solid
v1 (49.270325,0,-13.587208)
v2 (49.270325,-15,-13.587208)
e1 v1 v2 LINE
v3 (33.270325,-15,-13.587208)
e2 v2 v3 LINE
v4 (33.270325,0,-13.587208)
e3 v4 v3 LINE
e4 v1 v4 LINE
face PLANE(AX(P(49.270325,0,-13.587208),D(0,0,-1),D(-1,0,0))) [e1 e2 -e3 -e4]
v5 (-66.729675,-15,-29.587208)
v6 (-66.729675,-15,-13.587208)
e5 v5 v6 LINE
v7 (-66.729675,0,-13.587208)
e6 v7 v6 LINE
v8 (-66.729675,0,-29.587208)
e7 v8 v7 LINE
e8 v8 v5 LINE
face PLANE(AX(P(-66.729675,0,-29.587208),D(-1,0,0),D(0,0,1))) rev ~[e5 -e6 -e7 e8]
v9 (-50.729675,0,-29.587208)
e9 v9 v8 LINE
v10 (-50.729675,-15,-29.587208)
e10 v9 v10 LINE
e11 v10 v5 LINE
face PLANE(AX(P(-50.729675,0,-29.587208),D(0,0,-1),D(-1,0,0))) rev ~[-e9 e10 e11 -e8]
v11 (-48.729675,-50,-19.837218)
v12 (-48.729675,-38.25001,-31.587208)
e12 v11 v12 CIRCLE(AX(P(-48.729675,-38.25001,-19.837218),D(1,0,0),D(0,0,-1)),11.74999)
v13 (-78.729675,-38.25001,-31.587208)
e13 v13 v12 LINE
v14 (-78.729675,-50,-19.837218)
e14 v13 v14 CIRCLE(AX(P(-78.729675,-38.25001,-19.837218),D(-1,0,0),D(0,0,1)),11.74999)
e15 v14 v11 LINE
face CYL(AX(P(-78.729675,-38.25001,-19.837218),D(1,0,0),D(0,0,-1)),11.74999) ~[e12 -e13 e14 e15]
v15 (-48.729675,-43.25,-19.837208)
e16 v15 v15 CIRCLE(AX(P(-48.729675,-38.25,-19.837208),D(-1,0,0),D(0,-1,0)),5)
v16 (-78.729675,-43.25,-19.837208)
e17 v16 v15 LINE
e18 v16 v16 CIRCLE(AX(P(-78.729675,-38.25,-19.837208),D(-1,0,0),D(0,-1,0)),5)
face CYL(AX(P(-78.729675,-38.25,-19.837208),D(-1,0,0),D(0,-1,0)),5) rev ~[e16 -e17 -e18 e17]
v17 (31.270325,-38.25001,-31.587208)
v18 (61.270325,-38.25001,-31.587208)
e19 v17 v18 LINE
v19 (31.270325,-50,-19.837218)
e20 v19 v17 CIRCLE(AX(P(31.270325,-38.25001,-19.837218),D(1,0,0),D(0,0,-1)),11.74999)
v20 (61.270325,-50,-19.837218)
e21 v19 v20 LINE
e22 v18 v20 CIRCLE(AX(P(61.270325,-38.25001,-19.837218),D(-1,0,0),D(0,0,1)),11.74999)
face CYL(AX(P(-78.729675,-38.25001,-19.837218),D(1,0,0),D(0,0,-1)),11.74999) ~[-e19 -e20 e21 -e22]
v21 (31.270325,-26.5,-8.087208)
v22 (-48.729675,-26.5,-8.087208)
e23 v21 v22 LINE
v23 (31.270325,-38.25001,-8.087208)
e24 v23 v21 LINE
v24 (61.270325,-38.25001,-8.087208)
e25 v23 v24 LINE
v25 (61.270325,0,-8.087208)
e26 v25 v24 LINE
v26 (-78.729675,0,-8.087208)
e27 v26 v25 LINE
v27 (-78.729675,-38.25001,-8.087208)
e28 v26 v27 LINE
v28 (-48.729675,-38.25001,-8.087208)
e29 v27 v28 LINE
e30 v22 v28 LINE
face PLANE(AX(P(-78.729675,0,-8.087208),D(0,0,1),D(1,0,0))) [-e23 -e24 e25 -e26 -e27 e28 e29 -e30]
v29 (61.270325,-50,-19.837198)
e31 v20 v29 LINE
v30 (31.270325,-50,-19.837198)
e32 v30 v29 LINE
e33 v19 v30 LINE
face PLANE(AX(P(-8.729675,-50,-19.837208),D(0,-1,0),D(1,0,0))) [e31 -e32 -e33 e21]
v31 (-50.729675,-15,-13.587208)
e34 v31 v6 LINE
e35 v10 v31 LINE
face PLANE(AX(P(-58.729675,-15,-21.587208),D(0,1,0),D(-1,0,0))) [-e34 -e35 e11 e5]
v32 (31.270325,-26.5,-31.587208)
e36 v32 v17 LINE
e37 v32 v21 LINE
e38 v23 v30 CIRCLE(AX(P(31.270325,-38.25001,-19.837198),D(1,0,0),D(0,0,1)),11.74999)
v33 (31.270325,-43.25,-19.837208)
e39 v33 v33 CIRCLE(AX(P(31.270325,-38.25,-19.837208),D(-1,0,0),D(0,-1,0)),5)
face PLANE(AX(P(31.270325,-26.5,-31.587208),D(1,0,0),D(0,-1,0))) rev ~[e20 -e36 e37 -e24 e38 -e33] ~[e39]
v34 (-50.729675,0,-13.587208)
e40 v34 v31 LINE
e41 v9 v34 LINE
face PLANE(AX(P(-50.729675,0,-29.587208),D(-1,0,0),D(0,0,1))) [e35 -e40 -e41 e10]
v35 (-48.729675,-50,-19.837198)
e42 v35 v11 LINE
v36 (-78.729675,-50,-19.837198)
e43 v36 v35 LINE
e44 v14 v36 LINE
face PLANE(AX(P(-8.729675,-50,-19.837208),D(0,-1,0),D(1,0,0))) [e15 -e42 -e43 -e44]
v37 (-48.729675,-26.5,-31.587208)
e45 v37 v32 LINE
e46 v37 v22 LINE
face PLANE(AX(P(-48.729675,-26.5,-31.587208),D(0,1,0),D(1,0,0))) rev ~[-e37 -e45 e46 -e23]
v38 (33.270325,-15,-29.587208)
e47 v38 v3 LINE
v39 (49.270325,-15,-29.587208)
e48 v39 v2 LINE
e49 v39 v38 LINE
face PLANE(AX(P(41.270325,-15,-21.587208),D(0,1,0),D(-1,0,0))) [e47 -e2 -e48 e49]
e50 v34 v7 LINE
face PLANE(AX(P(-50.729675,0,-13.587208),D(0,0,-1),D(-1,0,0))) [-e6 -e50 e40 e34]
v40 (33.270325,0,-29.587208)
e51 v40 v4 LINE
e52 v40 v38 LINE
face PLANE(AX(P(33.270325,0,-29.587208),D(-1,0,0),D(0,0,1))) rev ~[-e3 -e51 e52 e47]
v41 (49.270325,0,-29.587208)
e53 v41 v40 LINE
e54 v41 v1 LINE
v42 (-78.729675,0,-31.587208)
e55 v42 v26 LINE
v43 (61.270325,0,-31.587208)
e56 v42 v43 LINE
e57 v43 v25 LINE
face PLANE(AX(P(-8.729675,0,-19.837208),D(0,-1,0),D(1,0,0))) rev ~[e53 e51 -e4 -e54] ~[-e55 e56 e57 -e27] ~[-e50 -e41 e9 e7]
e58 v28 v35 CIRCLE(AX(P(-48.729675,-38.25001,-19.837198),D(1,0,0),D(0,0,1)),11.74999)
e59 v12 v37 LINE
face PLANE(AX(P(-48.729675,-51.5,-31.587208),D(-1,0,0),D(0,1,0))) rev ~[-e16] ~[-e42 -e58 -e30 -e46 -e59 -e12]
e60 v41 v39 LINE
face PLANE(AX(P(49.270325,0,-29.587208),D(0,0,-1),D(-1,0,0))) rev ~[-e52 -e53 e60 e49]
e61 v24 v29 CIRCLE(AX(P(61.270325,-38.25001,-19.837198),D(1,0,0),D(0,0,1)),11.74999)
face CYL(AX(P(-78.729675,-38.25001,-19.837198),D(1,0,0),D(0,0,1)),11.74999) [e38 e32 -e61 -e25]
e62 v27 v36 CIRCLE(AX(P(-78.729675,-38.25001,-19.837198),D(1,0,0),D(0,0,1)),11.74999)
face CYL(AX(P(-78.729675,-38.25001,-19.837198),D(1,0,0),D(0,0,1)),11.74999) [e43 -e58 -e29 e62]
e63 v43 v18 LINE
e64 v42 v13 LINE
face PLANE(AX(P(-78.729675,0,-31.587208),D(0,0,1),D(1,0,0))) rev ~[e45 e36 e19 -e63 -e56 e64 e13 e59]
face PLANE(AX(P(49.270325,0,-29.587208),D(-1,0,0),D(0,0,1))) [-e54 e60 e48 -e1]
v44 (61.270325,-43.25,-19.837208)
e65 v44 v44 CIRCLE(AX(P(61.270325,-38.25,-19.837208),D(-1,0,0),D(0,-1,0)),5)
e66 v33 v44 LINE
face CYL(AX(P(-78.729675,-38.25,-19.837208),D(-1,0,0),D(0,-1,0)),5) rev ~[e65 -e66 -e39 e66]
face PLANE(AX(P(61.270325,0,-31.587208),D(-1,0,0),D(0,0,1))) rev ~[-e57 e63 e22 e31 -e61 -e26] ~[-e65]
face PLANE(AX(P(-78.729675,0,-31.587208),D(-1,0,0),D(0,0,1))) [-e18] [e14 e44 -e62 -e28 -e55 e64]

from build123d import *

# Parameters (mm, degrees)
F0_W     = 140
F0_H     = 23.5
F1_DEPTH = 50
F2_W     = 16
F2_H     = 16
F3_DEPTH = 15
F4_R     = 11.74999
F5_R     = 5
F6_DEPTH = 140
F8_DEPTH = 25


# Not quite as in the source:
# - a fillet or chamfer is up to 0.001 mm smaller than in the source, because OpenCascade refuses the exact size


with BuildPart() as f1:
    # F0 (on Front) → F1 (new body)
    with BuildSketch(Plane.XZ):
        with Locations((-8.7296748534, -19.8372076215)):
            Rectangle(F0_W, F0_H)
    extrude(amount=F1_DEPTH)

    # F2 (on face) → F3 (cut)
    with BuildSketch(Plane(origin=(0, 0, 0), x_dir=(-1, 0, 0), z_dir=(0, 1, 0))):
        with Locations((-41.2703251466, -21.5872076215)):
            Rectangle(F2_W, F2_H)
        with Locations((58.7296748534, -21.5872076215)):
            Rectangle(F2_W, F2_H)
    extrude(amount=-F3_DEPTH, mode=Mode.SUBTRACT)

    # F4 (radius 11.75 in the source; OpenCascade refuses exactly that, so slightly less here)
    f4_edges = [f1.edges().sort_by_distance(p)[0] for p in [
        (-8.729675, -50, -8.087208),
        (-8.729675, -50, -31.587208),
    ]]
    fillet(f4_edges, radius=F4_R)

    # F5 (on face) → F6 (cut, through all)
    with BuildSketch(Plane(origin=(-78.7296748534, 0, 0), x_dir=(0, -1, 0), z_dir=(-1, 0, 0))):
        with Locations((38.25, -19.8372076215)):
            Circle(F5_R)
    extrude(amount=-F6_DEPTH, mode=Mode.SUBTRACT)

    # F7 (on face) → F8 (cut)
    with BuildSketch(Plane(origin=(0, 0, -31.5872076215), x_dir=(1, 0, 0), z_dir=(0, 0, -1))):
        Polygon((31.2703251466, 51.5), (-8.7296748534, 51.5), (-48.7296748534, 51.5), (-48.7296748534, 26.5), (-8.7296748534, 26.5), (31.2703251466, 26.5), align=None)
    extrude(amount=-F8_DEPTH, mode=Mode.SUBTRACT)


solid = f1.part
